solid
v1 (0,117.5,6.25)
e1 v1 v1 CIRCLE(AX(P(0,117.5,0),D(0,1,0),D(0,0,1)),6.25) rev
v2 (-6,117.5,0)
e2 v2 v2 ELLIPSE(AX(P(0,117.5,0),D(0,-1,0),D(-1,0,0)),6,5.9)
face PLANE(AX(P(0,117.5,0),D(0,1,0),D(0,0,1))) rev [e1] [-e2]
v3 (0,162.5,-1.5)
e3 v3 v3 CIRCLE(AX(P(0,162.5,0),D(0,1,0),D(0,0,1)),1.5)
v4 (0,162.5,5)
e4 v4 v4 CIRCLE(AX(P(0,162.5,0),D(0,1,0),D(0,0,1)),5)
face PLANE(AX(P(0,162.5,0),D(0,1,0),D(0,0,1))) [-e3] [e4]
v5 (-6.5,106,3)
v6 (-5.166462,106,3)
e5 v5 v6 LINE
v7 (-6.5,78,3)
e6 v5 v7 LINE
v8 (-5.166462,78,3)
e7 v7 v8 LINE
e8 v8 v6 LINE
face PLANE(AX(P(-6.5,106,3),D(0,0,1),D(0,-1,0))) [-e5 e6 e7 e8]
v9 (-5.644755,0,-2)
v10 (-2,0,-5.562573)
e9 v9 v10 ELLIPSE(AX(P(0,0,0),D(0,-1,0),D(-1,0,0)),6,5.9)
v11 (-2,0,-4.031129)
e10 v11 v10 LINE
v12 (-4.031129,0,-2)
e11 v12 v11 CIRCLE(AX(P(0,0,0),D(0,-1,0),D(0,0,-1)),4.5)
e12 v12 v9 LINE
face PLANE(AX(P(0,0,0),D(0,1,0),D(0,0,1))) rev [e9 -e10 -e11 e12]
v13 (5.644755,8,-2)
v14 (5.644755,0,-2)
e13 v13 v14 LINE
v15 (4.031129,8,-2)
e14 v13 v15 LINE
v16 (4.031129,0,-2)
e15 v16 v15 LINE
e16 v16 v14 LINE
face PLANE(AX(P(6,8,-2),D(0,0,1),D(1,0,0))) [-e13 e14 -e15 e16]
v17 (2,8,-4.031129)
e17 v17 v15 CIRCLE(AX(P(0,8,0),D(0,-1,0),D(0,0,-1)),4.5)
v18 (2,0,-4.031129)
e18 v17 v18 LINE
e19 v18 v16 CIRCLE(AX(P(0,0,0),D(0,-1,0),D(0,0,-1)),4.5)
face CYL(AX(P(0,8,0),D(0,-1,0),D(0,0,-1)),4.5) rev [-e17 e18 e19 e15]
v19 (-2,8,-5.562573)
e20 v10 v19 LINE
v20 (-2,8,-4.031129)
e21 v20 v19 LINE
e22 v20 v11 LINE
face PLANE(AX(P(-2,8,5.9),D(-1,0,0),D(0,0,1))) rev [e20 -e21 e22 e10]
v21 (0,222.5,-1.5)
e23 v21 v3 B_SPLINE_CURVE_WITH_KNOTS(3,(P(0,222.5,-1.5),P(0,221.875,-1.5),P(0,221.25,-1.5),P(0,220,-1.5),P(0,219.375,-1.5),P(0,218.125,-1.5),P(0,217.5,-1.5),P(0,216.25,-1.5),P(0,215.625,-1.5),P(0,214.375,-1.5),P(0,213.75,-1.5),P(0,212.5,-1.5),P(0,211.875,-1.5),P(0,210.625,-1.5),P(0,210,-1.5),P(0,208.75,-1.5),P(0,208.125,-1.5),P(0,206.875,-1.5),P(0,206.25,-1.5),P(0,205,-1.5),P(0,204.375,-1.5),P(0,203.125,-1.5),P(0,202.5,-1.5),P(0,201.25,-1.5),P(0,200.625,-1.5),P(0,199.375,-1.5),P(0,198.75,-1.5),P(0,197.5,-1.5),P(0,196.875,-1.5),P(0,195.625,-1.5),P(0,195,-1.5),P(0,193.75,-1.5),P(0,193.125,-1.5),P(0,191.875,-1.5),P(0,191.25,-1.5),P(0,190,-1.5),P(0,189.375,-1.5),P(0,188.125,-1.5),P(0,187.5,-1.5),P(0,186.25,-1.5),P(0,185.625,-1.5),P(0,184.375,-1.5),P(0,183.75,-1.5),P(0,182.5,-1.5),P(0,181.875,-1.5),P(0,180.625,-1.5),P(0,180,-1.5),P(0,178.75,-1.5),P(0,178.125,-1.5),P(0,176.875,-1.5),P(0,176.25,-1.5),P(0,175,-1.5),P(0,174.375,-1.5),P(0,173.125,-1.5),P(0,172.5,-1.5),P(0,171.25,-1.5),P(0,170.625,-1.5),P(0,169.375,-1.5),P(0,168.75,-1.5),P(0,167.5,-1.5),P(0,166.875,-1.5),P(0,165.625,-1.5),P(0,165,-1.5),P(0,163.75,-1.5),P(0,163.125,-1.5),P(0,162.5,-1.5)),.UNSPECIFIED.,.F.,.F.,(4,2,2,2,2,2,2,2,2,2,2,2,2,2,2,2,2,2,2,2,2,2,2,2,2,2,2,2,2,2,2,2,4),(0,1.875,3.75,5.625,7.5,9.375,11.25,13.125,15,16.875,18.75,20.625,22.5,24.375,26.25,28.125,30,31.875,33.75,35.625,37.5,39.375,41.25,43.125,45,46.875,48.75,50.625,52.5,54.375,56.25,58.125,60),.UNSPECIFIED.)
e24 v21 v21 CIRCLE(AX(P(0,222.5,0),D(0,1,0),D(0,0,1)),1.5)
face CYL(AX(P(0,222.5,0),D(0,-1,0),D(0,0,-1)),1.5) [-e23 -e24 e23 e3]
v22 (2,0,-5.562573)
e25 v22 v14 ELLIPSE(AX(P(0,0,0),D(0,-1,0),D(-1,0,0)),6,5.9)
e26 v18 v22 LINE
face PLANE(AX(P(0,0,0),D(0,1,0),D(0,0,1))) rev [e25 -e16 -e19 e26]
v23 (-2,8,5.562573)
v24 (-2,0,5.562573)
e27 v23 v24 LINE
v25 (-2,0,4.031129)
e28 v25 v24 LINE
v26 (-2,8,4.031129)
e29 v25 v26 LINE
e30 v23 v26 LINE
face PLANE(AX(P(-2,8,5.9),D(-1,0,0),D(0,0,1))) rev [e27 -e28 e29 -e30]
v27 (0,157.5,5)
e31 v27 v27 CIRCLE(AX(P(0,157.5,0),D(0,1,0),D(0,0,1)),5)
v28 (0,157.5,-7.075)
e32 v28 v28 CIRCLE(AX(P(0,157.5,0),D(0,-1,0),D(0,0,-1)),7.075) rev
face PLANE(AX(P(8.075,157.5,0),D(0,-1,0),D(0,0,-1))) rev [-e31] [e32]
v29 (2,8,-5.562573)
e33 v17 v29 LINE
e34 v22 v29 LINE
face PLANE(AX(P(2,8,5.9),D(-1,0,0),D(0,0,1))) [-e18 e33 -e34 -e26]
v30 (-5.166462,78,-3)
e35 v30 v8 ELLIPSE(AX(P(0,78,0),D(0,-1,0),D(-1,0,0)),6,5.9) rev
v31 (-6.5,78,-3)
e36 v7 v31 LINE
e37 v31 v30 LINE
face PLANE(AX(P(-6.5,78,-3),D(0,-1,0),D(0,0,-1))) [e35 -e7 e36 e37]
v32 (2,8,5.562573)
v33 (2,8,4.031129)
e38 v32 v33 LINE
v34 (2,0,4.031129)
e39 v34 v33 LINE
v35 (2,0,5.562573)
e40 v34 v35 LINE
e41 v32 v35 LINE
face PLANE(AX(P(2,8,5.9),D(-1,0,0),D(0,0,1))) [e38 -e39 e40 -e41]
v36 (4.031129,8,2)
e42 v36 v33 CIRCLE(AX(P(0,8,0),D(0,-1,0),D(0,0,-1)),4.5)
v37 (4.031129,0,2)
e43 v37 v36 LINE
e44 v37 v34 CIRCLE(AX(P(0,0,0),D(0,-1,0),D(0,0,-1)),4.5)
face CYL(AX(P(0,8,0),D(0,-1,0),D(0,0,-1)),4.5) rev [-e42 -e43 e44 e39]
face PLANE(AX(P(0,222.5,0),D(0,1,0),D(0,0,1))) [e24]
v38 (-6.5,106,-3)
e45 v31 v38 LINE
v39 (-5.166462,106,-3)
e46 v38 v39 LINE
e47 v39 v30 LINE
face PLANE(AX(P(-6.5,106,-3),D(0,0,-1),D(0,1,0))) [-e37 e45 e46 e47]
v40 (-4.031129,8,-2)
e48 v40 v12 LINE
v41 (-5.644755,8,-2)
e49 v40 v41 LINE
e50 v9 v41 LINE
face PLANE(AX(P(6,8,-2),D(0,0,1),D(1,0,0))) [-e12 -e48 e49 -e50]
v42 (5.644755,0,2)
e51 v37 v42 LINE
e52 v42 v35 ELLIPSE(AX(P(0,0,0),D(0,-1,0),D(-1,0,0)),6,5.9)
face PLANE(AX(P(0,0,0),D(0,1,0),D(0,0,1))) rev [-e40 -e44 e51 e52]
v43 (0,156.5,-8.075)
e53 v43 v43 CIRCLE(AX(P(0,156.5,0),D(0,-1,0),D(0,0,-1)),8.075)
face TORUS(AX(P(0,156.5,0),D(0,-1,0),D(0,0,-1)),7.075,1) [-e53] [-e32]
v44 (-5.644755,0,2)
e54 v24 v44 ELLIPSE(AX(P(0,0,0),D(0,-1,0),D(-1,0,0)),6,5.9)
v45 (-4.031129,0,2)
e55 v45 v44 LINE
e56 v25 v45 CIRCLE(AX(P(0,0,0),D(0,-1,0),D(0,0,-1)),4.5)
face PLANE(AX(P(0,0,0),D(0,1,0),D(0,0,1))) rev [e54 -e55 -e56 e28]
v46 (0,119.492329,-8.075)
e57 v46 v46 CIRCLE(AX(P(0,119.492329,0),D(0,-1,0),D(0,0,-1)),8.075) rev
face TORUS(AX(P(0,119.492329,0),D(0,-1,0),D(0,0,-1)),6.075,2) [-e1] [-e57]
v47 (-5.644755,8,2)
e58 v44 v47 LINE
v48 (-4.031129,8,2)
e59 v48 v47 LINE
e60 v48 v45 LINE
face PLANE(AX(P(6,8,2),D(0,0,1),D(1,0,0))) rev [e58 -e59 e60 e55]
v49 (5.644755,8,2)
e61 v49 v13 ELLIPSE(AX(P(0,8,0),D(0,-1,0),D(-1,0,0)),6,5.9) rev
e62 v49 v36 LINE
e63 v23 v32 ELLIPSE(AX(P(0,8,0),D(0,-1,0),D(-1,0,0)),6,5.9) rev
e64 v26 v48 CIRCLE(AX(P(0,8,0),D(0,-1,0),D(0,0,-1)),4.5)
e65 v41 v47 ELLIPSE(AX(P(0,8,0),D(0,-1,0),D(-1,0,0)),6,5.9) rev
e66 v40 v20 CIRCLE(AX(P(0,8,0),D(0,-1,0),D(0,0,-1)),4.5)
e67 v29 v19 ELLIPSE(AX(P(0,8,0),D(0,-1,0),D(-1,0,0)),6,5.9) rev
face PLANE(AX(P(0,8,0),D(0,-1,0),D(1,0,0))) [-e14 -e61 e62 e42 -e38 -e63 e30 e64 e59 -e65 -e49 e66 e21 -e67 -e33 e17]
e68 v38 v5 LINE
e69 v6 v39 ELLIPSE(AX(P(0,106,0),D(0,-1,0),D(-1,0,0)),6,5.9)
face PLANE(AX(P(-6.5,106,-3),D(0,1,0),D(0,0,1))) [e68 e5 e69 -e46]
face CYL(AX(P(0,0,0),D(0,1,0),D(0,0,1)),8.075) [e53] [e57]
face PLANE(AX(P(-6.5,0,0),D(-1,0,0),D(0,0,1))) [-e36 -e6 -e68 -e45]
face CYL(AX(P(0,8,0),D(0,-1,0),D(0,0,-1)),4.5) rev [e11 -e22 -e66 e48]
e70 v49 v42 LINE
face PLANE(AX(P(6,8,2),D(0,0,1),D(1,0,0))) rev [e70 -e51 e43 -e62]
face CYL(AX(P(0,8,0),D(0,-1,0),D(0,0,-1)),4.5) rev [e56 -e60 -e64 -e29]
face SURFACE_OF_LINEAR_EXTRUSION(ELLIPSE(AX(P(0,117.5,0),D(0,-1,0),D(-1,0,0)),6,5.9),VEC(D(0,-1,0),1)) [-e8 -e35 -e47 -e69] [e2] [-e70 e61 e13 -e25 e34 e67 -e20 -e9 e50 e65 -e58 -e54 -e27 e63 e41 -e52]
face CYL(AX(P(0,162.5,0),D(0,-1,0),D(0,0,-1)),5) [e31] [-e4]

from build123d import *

# Parameters (mm, degrees)
REDONDEO1_R                  = 2
CROQUIS2_R                   = 5
SALIENTE_EXTRUIR1_DEPTH      = 5
REDONDEO2_R                  = 1
CROQUIS3_R                   = 1.5
SALIENTE_EXTRUIR2_DEPTH      = 60
CROQUIS4_W                   = 16.15
CROQUIS4_H                   = 16.15
CROQUIS4_RX                  = 6
CROQUIS4_RY                  = 5.9
CORTAR_EXTRUIR1_DEPTH        = 117.5
CROQUIS5_W                   = 6
CROQUIS5_H                   = 28
SALIENTE_EXTRUIR3_DEPTH      = 6.5
CROQUIS6_W                   = 12
CROQUIS6_H                   = 4
CROQUIS6_W_2                 = 4
CROQUIS6_H_2                 = 11.8
CORTAR_EXTRUIR_L_MINA1_DEPTH = 8
CROQUIS7_R                   = 4.5
CORTAR_EXTRUIR2_DEPTH        = 8


with BuildPart() as part:
    # Croquis1 → Revolución1 (revolve)
    with BuildSketch(Plane.XY, mode=Mode.PRIVATE) as revoluci_n1_sk:
        Polygon((0, 0), (6.25, 0), (6.25, 117.5), (8.075, 117.5), (8.075, 157.5), (0, 157.5), align=None)
    revolve(revoluci_n1_sk.sketch.rotate(Axis((0, 0, 0), (0, -1, 0)), 90), axis=Axis((0, 0, 0), (0, -1, 0)))

    # Redondeo1
    # the kernel refuses this fillet: 2 mm, written as the material it takes off along each edge
    with BuildSketch(Plane(origin=(0, 117.5, 0), x_dir=(0, 0, 1), z_dir=(1, 0, 0))) as redondeo1_piece_1:
        with BuildLine():
            CenterArc((6.075, -1.992329039), REDONDEO1_R, 0, 84.980199868)
            Line((8.075, -1.992329039), (8.115, -1.992329039))
            Line((8.115, -1.992329039), (8.115, 0))
            Line((8.115, 0), (8.075, 0.04))
            ThreePointArc((8.075, 0.04), (7.1625, 0.04), (6.2535, 0.039846581))
            Line((6.2535, 0.039846581), (6.25, 0))
        make_face()
    revolve(axis=Axis((0, 117.5, 0), (0, -1, 0)), mode=Mode.SUBTRACT)

    # Croquis2 → Saliente-Extruir1 (add)
    with BuildSketch(Plane(origin=(0, 157.5, 0), x_dir=(1, 0, 0), z_dir=(0, 1, 0))):
        with Locations(Location((0, 0, 0), (0, 0, 270))):
            Circle(CROQUIS2_R)
    extrude(amount=SALIENTE_EXTRUIR1_DEPTH)

    # Redondeo2
    redondeo2_edges = [part.edges().sort_by_distance(p)[0] for p in [
        (0, 157.5, -8.075),
    ]]
    fillet(redondeo2_edges, radius=REDONDEO2_R)

    # Croquis3 → Saliente-Extruir2 (add)
    with BuildSketch(Plane(origin=(0, 162.5, 0), x_dir=(1, 0, 0), z_dir=(0, 1, 0))):
        with Locations(Location((0, 0, 0), (0, 0, 90))):
            Circle(CROQUIS3_R)
    extrude(amount=SALIENTE_EXTRUIR2_DEPTH)

    # Croquis4 → Cortar-Extruir1 (cut)
    with BuildSketch(Plane.XZ):
        Rectangle(CROQUIS4_W, CROQUIS4_H)
        with Locations(Location((0, 0), (0, 0, 180))):
            Ellipse(CROQUIS4_RX, CROQUIS4_RY, mode=Mode.SUBTRACT)
    extrude(amount=-CORTAR_EXTRUIR1_DEPTH, mode=Mode.SUBTRACT)

    # Croquis5 → Saliente-Extruir3 (add)
    with BuildSketch(Plane(origin=(0, 0, 0), x_dir=(0, 0, -1), z_dir=(1, 0, 0))):
        with Locations((0, 92)):
            Rectangle(CROQUIS5_W, CROQUIS5_H)
    extrude(amount=-SALIENTE_EXTRUIR3_DEPTH)

    # Croquis6 → Cortar-Extruir-Lámina1 (cut)
    with BuildSketch(Plane.XZ):
        Rectangle(CROQUIS6_W, CROQUIS6_H)
        Rectangle(CROQUIS6_W_2, CROQUIS6_H_2)
    extrude(amount=-CORTAR_EXTRUIR_L_MINA1_DEPTH, mode=Mode.SUBTRACT)

    # Croquis7 → Cortar-Extruir2 (cut)
    with BuildSketch(Plane.XZ):
        Circle(CROQUIS7_R)
    extrude(amount=-CORTAR_EXTRUIR2_DEPTH, mode=Mode.SUBTRACT)


solid = part.part
